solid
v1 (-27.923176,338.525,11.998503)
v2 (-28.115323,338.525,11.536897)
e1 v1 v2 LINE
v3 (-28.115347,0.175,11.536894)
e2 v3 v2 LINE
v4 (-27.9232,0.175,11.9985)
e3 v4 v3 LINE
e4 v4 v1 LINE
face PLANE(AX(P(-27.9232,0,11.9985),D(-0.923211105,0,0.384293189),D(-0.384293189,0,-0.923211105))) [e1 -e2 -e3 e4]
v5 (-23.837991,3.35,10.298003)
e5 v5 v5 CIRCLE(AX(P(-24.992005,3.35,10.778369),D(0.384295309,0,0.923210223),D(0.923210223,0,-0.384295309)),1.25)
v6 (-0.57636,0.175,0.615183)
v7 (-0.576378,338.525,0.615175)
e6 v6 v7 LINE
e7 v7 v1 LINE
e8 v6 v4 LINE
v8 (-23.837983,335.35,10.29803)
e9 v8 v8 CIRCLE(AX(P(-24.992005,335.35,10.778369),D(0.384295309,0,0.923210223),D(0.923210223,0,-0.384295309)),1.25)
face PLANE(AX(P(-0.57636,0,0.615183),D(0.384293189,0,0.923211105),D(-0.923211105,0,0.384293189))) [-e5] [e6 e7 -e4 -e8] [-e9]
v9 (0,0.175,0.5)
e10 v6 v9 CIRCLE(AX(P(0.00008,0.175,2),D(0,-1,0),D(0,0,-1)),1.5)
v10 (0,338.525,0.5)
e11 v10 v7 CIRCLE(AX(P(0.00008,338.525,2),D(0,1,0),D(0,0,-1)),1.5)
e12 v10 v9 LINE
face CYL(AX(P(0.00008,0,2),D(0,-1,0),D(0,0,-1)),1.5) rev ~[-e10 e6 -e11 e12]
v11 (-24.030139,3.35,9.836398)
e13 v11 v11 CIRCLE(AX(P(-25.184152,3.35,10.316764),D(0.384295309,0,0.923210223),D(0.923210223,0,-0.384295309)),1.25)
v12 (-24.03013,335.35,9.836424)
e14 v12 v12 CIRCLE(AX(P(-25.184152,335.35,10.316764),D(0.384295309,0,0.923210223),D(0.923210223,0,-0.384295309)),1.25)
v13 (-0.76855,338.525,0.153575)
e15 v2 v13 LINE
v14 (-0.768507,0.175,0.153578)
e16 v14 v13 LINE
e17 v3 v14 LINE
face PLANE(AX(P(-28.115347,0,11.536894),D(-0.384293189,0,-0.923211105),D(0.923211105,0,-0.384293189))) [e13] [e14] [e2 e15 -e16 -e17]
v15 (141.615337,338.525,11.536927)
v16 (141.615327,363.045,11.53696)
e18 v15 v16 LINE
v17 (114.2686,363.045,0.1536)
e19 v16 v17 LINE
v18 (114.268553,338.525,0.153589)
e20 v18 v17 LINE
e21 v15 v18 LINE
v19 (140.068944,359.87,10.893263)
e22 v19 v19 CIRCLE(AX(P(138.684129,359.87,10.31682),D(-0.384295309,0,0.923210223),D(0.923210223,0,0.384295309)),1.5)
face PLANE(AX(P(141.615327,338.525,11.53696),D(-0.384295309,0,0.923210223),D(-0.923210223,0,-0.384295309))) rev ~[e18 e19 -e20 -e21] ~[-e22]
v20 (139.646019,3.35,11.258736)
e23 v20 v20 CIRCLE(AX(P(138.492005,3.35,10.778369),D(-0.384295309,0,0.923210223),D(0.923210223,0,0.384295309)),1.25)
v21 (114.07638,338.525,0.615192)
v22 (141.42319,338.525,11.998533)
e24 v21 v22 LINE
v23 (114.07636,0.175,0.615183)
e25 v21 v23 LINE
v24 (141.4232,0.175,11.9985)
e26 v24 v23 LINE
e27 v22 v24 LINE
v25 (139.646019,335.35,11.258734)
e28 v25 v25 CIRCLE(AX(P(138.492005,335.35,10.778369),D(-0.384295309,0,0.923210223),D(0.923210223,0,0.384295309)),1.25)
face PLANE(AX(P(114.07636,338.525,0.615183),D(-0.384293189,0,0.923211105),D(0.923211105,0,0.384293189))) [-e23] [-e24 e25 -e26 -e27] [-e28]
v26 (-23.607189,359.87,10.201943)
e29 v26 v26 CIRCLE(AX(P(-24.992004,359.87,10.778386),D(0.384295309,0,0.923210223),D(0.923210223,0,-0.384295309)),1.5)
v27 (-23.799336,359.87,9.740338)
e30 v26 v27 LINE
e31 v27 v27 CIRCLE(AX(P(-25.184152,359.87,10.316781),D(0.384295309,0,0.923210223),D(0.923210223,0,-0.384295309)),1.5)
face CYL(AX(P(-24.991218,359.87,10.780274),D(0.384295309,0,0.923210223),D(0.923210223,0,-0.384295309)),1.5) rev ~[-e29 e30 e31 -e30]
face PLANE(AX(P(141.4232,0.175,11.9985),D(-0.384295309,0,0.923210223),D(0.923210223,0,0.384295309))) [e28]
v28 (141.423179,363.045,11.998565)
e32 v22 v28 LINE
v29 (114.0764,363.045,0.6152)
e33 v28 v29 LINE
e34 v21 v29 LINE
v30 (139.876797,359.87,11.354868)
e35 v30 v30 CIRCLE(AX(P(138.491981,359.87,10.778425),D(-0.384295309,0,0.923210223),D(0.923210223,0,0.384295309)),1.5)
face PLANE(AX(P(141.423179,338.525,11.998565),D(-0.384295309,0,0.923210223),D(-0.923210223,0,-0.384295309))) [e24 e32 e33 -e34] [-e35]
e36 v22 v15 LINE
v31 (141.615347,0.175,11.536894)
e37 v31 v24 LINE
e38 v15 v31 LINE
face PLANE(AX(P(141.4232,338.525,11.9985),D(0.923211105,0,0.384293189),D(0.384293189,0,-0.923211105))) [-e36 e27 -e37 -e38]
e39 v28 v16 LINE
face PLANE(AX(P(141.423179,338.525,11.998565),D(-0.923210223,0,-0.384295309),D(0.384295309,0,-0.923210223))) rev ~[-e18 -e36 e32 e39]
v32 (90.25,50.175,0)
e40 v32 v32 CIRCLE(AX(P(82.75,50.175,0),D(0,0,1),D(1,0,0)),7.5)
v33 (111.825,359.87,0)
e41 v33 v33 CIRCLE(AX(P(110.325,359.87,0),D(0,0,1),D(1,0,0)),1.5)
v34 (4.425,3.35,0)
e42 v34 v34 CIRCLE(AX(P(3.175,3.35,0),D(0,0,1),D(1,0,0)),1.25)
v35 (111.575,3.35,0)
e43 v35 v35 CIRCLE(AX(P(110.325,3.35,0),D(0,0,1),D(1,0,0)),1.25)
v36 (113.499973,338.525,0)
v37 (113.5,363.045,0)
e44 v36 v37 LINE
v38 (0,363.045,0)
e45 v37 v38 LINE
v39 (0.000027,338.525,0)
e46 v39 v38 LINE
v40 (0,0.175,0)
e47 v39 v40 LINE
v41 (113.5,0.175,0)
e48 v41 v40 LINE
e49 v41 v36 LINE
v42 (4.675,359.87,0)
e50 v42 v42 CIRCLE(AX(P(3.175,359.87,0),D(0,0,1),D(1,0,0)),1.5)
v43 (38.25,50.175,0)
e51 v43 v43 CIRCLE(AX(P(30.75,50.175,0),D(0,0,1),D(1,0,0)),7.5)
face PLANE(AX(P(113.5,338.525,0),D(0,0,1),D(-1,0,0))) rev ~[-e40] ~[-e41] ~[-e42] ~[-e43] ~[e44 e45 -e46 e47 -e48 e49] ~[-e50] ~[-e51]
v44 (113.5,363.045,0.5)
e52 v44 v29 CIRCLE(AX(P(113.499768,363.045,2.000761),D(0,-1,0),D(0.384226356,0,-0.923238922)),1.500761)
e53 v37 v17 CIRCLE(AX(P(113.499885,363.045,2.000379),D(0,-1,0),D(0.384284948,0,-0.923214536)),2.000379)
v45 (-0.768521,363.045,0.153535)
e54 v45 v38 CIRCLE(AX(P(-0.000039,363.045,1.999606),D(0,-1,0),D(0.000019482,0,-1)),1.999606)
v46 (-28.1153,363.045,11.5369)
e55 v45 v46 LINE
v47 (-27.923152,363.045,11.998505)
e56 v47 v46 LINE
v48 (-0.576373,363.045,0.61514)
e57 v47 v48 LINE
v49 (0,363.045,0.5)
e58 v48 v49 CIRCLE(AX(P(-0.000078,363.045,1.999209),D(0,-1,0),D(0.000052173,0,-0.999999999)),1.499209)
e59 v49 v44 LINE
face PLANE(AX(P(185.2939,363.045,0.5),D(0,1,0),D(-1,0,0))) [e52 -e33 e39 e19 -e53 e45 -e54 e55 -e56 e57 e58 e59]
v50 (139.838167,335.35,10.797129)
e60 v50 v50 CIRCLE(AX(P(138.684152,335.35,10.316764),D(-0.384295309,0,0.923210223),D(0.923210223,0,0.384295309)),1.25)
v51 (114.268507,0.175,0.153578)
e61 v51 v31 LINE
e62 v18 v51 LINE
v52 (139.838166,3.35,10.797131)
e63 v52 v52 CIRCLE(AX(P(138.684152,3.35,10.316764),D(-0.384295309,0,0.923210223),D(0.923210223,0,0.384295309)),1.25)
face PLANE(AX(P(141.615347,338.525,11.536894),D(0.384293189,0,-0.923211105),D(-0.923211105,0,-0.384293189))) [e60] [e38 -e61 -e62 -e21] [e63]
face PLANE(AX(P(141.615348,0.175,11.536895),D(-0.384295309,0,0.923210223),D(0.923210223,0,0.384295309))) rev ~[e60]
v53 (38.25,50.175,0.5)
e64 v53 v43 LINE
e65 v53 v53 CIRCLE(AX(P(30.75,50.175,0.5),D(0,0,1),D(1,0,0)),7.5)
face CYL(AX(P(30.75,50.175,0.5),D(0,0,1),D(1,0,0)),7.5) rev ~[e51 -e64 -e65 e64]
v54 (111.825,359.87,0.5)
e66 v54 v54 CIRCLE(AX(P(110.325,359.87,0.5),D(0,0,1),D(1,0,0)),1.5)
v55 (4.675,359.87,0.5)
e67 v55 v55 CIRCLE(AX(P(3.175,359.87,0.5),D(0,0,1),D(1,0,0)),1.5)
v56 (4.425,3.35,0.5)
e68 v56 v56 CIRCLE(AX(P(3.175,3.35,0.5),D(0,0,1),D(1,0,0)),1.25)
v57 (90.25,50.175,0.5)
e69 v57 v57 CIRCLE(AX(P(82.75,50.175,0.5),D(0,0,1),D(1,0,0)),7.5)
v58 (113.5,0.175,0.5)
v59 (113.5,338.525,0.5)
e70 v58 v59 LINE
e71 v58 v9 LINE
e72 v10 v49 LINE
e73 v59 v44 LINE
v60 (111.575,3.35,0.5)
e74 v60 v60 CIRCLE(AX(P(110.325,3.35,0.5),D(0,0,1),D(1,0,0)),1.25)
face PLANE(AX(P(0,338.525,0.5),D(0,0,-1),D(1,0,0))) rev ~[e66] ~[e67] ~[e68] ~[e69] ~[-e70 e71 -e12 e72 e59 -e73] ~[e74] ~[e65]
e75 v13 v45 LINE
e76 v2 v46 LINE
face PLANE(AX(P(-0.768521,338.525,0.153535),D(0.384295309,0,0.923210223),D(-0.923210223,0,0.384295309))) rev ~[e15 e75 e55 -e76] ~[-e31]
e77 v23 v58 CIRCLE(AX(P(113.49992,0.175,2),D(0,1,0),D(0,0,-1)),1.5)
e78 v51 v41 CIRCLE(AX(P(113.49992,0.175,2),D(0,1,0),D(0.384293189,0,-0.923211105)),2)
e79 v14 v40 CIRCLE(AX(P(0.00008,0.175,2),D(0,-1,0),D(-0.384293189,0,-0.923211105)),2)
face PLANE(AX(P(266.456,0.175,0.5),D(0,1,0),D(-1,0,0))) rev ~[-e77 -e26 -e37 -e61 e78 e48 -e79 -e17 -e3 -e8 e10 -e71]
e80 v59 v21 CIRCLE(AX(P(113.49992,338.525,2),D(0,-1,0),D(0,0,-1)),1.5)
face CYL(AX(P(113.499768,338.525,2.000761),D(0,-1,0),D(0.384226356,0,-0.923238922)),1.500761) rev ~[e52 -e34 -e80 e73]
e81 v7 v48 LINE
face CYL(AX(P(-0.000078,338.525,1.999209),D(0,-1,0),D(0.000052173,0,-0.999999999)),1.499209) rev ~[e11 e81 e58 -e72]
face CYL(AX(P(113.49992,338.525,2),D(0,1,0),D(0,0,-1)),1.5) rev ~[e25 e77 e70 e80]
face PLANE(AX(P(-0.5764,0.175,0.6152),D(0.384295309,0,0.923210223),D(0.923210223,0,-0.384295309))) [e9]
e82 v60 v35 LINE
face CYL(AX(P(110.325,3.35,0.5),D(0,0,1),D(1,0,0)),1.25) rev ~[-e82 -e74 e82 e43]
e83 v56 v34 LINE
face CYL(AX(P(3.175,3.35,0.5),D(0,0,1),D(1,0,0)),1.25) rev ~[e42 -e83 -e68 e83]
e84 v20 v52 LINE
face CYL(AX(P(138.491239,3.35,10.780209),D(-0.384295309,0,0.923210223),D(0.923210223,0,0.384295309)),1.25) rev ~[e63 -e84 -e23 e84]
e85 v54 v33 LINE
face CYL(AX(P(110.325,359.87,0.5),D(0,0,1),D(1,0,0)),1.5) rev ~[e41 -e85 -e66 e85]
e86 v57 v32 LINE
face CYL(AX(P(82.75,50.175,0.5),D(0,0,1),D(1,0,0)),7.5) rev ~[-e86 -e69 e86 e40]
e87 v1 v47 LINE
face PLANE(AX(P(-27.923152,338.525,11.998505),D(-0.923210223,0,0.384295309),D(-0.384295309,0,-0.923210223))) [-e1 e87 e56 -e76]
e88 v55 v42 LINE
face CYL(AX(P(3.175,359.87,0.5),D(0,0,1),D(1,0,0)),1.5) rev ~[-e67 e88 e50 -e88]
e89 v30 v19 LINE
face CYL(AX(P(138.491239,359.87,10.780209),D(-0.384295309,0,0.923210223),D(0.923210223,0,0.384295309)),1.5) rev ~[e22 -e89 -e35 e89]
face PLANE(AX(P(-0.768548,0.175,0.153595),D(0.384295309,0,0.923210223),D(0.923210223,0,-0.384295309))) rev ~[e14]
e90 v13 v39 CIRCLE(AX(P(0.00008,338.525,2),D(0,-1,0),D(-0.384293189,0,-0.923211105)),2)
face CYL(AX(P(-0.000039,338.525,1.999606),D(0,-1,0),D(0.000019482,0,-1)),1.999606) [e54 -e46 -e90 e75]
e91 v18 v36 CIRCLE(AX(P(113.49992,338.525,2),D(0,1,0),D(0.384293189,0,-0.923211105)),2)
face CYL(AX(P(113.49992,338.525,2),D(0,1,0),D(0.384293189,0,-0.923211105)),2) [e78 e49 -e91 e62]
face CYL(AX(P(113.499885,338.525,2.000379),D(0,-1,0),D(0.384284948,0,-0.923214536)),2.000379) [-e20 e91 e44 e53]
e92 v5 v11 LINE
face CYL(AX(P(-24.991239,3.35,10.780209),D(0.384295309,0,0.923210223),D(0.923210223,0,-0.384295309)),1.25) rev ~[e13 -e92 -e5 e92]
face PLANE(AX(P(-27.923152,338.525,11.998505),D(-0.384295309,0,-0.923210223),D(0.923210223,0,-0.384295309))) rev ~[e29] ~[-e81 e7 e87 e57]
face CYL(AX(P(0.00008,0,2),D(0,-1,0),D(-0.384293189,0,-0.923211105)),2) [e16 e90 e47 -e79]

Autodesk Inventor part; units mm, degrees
ref_plane "YZ Plane" through (0, 0, 0) normal (1, 0, 0) x (0, 1, 0)
ref_plane "XZ Plane" through (0, 0, 0) normal (0, 1, 0) x (-1, 0, 0)
ref_plane "XY Plane" through (0, 0, 0) normal (0, 0, 1) x (1, 0, 0)
sketch "Sketch1" plane through (0, 0, 0) normal (0, 0, 1) x (1, 0, 0)
  line L0 (0, 0) -> (113.5, 0)
  line L1 (113.5, 0) -> (113.5, 338.525)
  line L2 (113.5, 338.525) -> (0, 338.525)
  line L3 (0, 338.525) -> (0, 0)
  dimension "d0" = 113.5
  dimension "d1" = 338.525
extrude "Plate1" add sketch "Sketch1" along normal blind 0.5
sketch "Sketch2" plane through (114.0764, 338.525, 0.6152) normal (0.3842953, 0, -0.9232102) x (0, 1, 0)
  line L0 (-338.525, 0) -> (0, 0)
  line L1 (0, 0) -> (0, 29.6214)
  line L2 (0, 29.6214) -> (-338.525, 29.6214)
  line L3 (-338.525, 29.6214) -> (-338.525, 0)
edge flange "Flange1" height 30.021 angle 22.6 thickness 0.5 bend radius 1.5 thickness toward (0.3842953, 0, -0.9232102) relief tear relief width 0.5 relief depth 0.25 edges at (113.5, 169.2625, 0.5) wall of the first edge with corners at (114.0764, 0, 0.6152) (114.0764, 338.525, 0.6152) (141.4232, 338.525, 11.9985) (141.4232, 0, 11.9985)
bend "Bend1"
corner "Corner1"
sketch "Sketch3" plane through (-0.5764, 0, 0.6152) normal (-0.3842953, 0, -0.9232102) x (0, -1, 0)
  line L0 (-338.525, 0) -> (0, 0)
  line L1 (0, 0) -> (0, 29.6214)
  line L2 (0, 29.6214) -> (-338.525, 29.6214)
  line L3 (-338.525, 29.6214) -> (-338.525, 0)
edge flange "Flange2" height 30.021 angle 22.6 thickness 0.5 bend radius 1.5 thickness toward (-0.3842953, 0, -0.9232102) relief tear relief width 0.5 relief depth 0.25 edges at (0, 169.2625, 0.5) wall of the first edge with corners at (-0.5764, 338.525, 0.6152) (-0.5764, 0, 0.6152) (-27.9232, 0, 11.9985) (-27.9232, 338.525, 11.9985)
bend "Bend2"
corner "Corner2"
sketch "Sketch4" plane through (-27.9232, 0, 11.9985) normal (0.3842953, 0, 0.9232102) x (0.9232102, 0, -0.3842953)
  line L0 (0, 338.525) -> (0, 0) projected
  line L1 (0, 338.525) -> (0, 335.35) construction
  line L2 (0, 335.35) -> (3.175, 335.35) construction
  circle A0 centre (3.175, 335.35) radius 1.25
  line L3 (0, 0) -> (0, 3.175) construction
  line L4 (0, 3.175) -> (3.175, 3.175) construction
  line L5 (3.175, 3.175) -> (3.175, 3.35) construction
  circle A1 centre (3.175, 3.35) radius 1.25
  point P0 (30.39, 0)
  dimension "d23" = 3.175
  dimension "d24" = 3.175
  dimension "d25" = 2.5
  dimension "d26" = 3.175
  dimension "d27" = 3.175
  dimension "d62" = 0.175
  dimension "d63" = 2.5
extrude "Extrusion1" cut sketch "Sketch4" against normal blind 10
sketch "Sketch5" plane through (0, 0, 0.5) normal (0, 0, 1) x (1, 0, 0)
  line L0 (0, 0) -> (0, 338.525) projected
  line L1 (113.5, 0) -> (0, 0) projected
  line L2 (113.5, 338.525) -> (113.5, 0) projected
  line L3 (0, 338.525) -> (0, 335.35) construction
  line L4 (0, 335.35) -> (3.175, 335.35) construction
  line L5 (113.5, 338.525) -> (113.5, 335.35) construction
  line L6 (113.5, 335.35) -> (110.325, 335.35) construction
  line L7 (0, 0) -> (3.175, 0) construction
  line L8 (0, 0) -> (113.5, 0) construction
  line L9 (3.175, 0) -> (3.175, 3.175) construction
  line L10 (113.5, 0) -> (113.5, 3.175) construction
  line L11 (113.5, 3.175) -> (110.325, 3.175) construction
  circle A0 centre (3.175, 335.35) radius 1.25
  circle A1 centre (110.325, 335.35) radius 1.25
  line L12 (3.175, 3.175) -> (3.175, 3.35) construction
  line L13 (110.325, 3.175) -> (110.325, 3.35) construction
  circle A2 centre (110.325, 3.35) radius 1.25
  circle A3 centre (3.175, 3.35) radius 1.25
  dimension "d31" = 3.175
  dimension "d32" = 3.175
  dimension "d33" = 3.175
  dimension "d34" = 3.175
  dimension "d35" = 3.175
  dimension "d36" = 3.175
  dimension "d37" = 3.175
  dimension "d38" = 3.175
  dimension "d41" = 2.5
  dimension "d42" = 2.5
  dimension "d58" = 0.175
  dimension "d59" = 0.175
  dimension "d60" = 2.5
  dimension "d61" = 2.5
extrude "Extrusion2" cut sketch "Sketch5" against normal blind 10
sketch "Sketch6" plane through (141.4232, 0, 11.9985) normal (-0.3842953, 0, 0.9232102) x (0.9232102, 0, 0.3842953)
  line L0 (0, 338.525) -> (0, 335.35) construction
  line L1 (0, 0) -> (0, 338.525) construction
  line L2 (0, 335.35) -> (-3.175, 335.35) construction
  line L3 (0, 0) -> (0, 3.175) construction
  line L4 (0, 3.175) -> (-3.175, 3.175) construction
  circle A0 centre (-3.175, 335.35) radius 1.25
  line L5 (-3.175, 3.175) -> (-3.175, 3.35) construction
  circle A1 centre (-3.175, 3.35) radius 1.25
  point P0 (-135.1743, 0)
  dimension "d45" = 3.175
  dimension "d46" = 3.175
  dimension "d47" = 3.175
  dimension "d48" = 3.175
  dimension "d50" = 2.5
  dimension "d64" = 0.175
  dimension "d65" = 2.5
extrude "Extrusion3" cut sketch "Sketch6" against normal blind 10
sketch "Sketch7" plane through (0, 0, 0.5) normal (0, 0, 1) x (1, 0, 0)
  line L0 (-71.3896, 0) -> (266.456, 0)
  line L1 (266.456, 0) -> (266.456, 0.175)
  line L2 (266.456, 0.175) -> (-71.3896, 0.175)
  line L3 (-71.3896, 0.175) -> (-71.3896, 0)
  dimension "d53" = 0.175
extrude "Extrusion4" cut sketch "Sketch7" against normal blind 100 and the other way blind 100
sketch "Sketch9" plane through (-28.1153, 338.525, 11.5369) normal (0, 1, 0) x (0.9232102, 0, -0.3842953)
  line L0 (29.6214, -0.5) -> (29.6214, 0) projected
  line L1 (29.6214, 0) -> (0, 0) projected
  line L2 (0, -0.5) -> (0, 0) projected
  line L3 (0, -0.5) -> (29.6214, -0.5) projected
  point P0 (30.39, -0.1536)
extrude "Extrusion5" add sketch "Sketch9" along normal blind 30.87
sketch "Sketch10" plane through (0, 338.525, 0.5) normal (0, 1, 0) x (1, 0, 0)
  line L0 (-0.5764, -0.1152) -> (-0.7686, 0.3464) projected
  arc A0 (0, 0) -> (-0.5764, -0.1152) centre (0, -1.5) ccw projected
  line L1 (0, 0.5) -> (0, 0) projected
  arc A1 (0, 0.5) -> (-0.7686, 0.3464) centre (0, -1.5) ccw projected
extrude "Extrusion6" add sketch "Sketch10" along normal blind 30.87
sketch "Sketch11" plane through (0, 338.525, 0) normal (0, 1, 0) x (1, 0, 0)
  line L0 (0, -0.5) -> (113.5, -0.5) projected
  line L1 (113.5, 0) -> (113.5, -0.5) projected
  line L2 (113.5, 0) -> (0, 0) projected
  line L3 (0, 0) -> (0, -0.5) projected
extrude "Extrusion7" add sketch "Sketch11" along normal blind 30.87
sketch "Sketch12" plane through (113.5, 338.525, 0.5) normal (0, 1, 0) x (1, 0, 0)
  line L0 (0.7686, 0.3464) -> (0.5764, -0.1152) projected
  arc A0 (0.7686, 0.3464) -> (0, 0.5) centre (0, -1.5) ccw projected
  line L1 (0, 0.5) -> (0, 0) projected
  arc A1 (0.5764, -0.1152) -> (0, 0) centre (0, -1.5) ccw projected
  point P0 (-113.5, 0.5)
extrude "Extrusion8" add sketch "Sketch12" along normal blind 30.87
sketch "Sketch13" plane through (114.0764, 338.525, 0.6152) normal (0, 1, 0) x (0.9232102, 0, 0.3842953)
  line L0 (0, 0.5) -> (0, 0) projected
  line L1 (29.6214, 0) -> (0, 0) projected
  line L2 (29.6214, 0) -> (29.6214, 0.5) projected
  line L3 (29.6214, 0.5) -> (0, 0.5) projected
  point P0 (-105.553, -43.2711)
extrude "Extrusion9" add sketch "Sketch13" along normal blind 30.87
sketch "Sketch14" plane through (0, 0, 0.5) normal (0, 0, 1) x (1, 0, 0)
  circle A0 centre (3.175, 335.35) radius 1.25 projected
  point P0 (0, 0)
extrude "Extrusion10" add sketch "Sketch14" against normal up to surface (0.5 mm away)
sketch "Sketch15" plane through (0, 0, 0.5) normal (0, 0, 1) x (1, 0, 0)
  circle A0 centre (110.325, 335.35) radius 1.25 projected
  point P0 (0, 0)
extrude "Extrusion11" add sketch "Sketch15" against normal up to surface (0.5 mm away)
sketch "Sketch16" plane through (141.4232, 0.175, 11.9985) normal (-0.3842953, 0, 0.9232102) x (0.9232102, 0, 0.3842953)
  circle A0 centre (-3.175, 335.175) radius 1.25 projected
  point P0 (-135.1743, -0.175)
extrude "Extrusion12" add sketch "Sketch16" against normal up to surface (0.5 mm away)
sketch "Sketch17" plane through (-0.5764, 0.175, 0.6152) normal (0.3842953, 0, 0.9232102) x (0.9232102, 0, -0.3842953)
  circle A0 centre (-26.4464, 335.175) radius 1.25 projected
  point P0 (0.7686, -0.175)
extrude "Extrusion13" add sketch "Sketch17" against normal up to surface (0.5 mm away)
sketch "Sketch18" plane through (0, 0, 0.5) normal (0, 0, 1) x (1, 0, 0)
  line L0 (113.5, 0.175) -> (113.5, 369.395) projected
  line L1 (0, 0.175) -> (0, 369.395) projected
  line L2 (0, 369.395) -> (0, 359.87) construction
  line L3 (0, 359.87) -> (3.175, 359.87) construction
  circle A0 centre (3.175, 359.87) radius 1.5
  line L4 (113.5, 369.395) -> (113.5, 359.87) construction
  line L5 (113.5, 359.87) -> (110.325, 359.87) construction
  circle A1 centre (110.325, 359.87) radius 1.5
  point P0 (0, 0)
  dimension "d84" = 9.525
  dimension "d85" = 3.175
  dimension "d86" = 3
  dimension "d87" = 9.525
  dimension "d88" = 3.175
  dimension "d89" = 3
extrude "Extrusion14" cut sketch "Sketch18" against normal blind 30.87
sketch "Sketch19" plane through (-0.5764, 0.175, 0.6152) normal (0.3842953, 0, 0.9232102) x (0.9232102, 0, -0.3842953)
  line L0 (-29.6214, 369.22) -> (-29.6214, 0) projected
  line L1 (-29.6214, 369.22) -> (-29.6214, 359.695) construction
  line L2 (-29.6214, 359.695) -> (-26.4464, 359.695) construction
  circle A0 centre (-26.4464, 359.695) radius 1.5
  point P0 (0.7686, -0.175)
  dimension "d92" = 9.525
  dimension "d93" = 3.175
  dimension "d94" = 3
extrude "Extrusion15" cut sketch "Sketch19" against normal blind 30.87
sketch "Sketch20" plane through (141.4232, 0.175, 11.9985) normal (-0.3842953, 0, 0.9232102) x (0.9232102, 0, 0.3842953)
  line L0 (0, 0) -> (0, 369.22) projected
  line L1 (0, 369.22) -> (0, 359.695)
  line L2 (0, 359.695) -> (-3.175, 359.695)
  circle A0 centre (-3.175, 359.695) radius 1.5
  point P0 (-135.1743, -0.175)
  dimension "d97" = 9.525
  dimension "d98" = 3.175
  dimension "d99" = 3
extrude "Extrusion16" cut sketch "Sketch20" against normal blind 30.87
sketch "Sketch21" plane through (0, 0, 0.5) normal (0, 0, 1) x (1, 0, 0)
  line L0 (-35.0424, 369.395) -> (185.2939, 369.395)
  line L1 (185.2939, 369.395) -> (185.2939, 363.045)
  line L2 (185.2939, 363.045) -> (-35.0424, 363.045)
  line L3 (-35.0424, 363.045) -> (-35.0424, 369.395)
  point P0 (0, 0)
  dimension "d102" = 6.35
extrude "Extrusion17" cut sketch "Sketch21" against normal blind 30.87 and the other way blind 15.435
sketch "Sketch22" plane through (0, 0, 0.5) normal (0, 0, 1) x (1, 0, 0)
  line L0 (0, 0.175) -> (113.5, 0.175) projected
  line L1 (113.5, 0.175) -> (56.75, 0.175) construction
  line L2 (56.75, 0.175) -> (56.75, 50.175) construction
  line L3 (56.75, 50.175) -> (30.75, 50.175) construction
  circle A0 centre (30.75, 50.175) radius 7.5
  line L4 (56.75, 0.175) -> (56.75, 50.175) construction
  line L5 (56.75, 50.175) -> (82.75, 50.175) construction
  circle A1 centre (82.75, 50.175) radius 7.5
  point P0 (0, 0)
  dimension "d107" = 56.75
  dimension "d108" = 50
  dimension "d110" = 26
  dimension "d112" = 15
  dimension "d115" = 50
  dimension "d116" = 26
  dimension "d117" = 15
extrude "Extrusion18" cut sketch "Sketch22" against normal blind 10
equation "\"d2\" = Thickness"
equation "\"d3\" = BendReliefWidth"
equation "\"d4\" = BendReliefDepth"
equation "\"d5\" = MinimumRemnant"
equation "\"d6\" = TransitionRadius"
equation "\"d10\" = CornerReliefSize"
equation "\"d11\" = GapSize"
equation "\"d12\" = JacobiRadiusSize"
equation "\"d13\" = BendReliefWidth"
equation "\"d14\" = BendReliefDepth"
equation "\"d15\" = MinimumRemnant"
equation "\"d16\" = TransitionRadius"
equation "\"d20\" = CornerReliefSize"
equation "\"d21\" = GapSize"
equation "\"d22\" = JacobiRadiusSize"
equation "\"BendRadius\" = Thickness"
equation "\"BendReliefWidth\" = Thickness"
equation "\"BendReliefDepth\" = 0.5 * Thickness"
equation "\"CornerReliefSize\" = 4 * Thickness"
equation "\"MinimumRemnant\" = 2 * Thickness"
equation "\"TransitionRadius\" = BendRadius"
equation "\"JacobiRadiusSize\" = BendRadius"
equation "\"GapSize\" = Thickness"
equation "\"Thickness\" = 0.5"
properties part number "sideplate part 4"
